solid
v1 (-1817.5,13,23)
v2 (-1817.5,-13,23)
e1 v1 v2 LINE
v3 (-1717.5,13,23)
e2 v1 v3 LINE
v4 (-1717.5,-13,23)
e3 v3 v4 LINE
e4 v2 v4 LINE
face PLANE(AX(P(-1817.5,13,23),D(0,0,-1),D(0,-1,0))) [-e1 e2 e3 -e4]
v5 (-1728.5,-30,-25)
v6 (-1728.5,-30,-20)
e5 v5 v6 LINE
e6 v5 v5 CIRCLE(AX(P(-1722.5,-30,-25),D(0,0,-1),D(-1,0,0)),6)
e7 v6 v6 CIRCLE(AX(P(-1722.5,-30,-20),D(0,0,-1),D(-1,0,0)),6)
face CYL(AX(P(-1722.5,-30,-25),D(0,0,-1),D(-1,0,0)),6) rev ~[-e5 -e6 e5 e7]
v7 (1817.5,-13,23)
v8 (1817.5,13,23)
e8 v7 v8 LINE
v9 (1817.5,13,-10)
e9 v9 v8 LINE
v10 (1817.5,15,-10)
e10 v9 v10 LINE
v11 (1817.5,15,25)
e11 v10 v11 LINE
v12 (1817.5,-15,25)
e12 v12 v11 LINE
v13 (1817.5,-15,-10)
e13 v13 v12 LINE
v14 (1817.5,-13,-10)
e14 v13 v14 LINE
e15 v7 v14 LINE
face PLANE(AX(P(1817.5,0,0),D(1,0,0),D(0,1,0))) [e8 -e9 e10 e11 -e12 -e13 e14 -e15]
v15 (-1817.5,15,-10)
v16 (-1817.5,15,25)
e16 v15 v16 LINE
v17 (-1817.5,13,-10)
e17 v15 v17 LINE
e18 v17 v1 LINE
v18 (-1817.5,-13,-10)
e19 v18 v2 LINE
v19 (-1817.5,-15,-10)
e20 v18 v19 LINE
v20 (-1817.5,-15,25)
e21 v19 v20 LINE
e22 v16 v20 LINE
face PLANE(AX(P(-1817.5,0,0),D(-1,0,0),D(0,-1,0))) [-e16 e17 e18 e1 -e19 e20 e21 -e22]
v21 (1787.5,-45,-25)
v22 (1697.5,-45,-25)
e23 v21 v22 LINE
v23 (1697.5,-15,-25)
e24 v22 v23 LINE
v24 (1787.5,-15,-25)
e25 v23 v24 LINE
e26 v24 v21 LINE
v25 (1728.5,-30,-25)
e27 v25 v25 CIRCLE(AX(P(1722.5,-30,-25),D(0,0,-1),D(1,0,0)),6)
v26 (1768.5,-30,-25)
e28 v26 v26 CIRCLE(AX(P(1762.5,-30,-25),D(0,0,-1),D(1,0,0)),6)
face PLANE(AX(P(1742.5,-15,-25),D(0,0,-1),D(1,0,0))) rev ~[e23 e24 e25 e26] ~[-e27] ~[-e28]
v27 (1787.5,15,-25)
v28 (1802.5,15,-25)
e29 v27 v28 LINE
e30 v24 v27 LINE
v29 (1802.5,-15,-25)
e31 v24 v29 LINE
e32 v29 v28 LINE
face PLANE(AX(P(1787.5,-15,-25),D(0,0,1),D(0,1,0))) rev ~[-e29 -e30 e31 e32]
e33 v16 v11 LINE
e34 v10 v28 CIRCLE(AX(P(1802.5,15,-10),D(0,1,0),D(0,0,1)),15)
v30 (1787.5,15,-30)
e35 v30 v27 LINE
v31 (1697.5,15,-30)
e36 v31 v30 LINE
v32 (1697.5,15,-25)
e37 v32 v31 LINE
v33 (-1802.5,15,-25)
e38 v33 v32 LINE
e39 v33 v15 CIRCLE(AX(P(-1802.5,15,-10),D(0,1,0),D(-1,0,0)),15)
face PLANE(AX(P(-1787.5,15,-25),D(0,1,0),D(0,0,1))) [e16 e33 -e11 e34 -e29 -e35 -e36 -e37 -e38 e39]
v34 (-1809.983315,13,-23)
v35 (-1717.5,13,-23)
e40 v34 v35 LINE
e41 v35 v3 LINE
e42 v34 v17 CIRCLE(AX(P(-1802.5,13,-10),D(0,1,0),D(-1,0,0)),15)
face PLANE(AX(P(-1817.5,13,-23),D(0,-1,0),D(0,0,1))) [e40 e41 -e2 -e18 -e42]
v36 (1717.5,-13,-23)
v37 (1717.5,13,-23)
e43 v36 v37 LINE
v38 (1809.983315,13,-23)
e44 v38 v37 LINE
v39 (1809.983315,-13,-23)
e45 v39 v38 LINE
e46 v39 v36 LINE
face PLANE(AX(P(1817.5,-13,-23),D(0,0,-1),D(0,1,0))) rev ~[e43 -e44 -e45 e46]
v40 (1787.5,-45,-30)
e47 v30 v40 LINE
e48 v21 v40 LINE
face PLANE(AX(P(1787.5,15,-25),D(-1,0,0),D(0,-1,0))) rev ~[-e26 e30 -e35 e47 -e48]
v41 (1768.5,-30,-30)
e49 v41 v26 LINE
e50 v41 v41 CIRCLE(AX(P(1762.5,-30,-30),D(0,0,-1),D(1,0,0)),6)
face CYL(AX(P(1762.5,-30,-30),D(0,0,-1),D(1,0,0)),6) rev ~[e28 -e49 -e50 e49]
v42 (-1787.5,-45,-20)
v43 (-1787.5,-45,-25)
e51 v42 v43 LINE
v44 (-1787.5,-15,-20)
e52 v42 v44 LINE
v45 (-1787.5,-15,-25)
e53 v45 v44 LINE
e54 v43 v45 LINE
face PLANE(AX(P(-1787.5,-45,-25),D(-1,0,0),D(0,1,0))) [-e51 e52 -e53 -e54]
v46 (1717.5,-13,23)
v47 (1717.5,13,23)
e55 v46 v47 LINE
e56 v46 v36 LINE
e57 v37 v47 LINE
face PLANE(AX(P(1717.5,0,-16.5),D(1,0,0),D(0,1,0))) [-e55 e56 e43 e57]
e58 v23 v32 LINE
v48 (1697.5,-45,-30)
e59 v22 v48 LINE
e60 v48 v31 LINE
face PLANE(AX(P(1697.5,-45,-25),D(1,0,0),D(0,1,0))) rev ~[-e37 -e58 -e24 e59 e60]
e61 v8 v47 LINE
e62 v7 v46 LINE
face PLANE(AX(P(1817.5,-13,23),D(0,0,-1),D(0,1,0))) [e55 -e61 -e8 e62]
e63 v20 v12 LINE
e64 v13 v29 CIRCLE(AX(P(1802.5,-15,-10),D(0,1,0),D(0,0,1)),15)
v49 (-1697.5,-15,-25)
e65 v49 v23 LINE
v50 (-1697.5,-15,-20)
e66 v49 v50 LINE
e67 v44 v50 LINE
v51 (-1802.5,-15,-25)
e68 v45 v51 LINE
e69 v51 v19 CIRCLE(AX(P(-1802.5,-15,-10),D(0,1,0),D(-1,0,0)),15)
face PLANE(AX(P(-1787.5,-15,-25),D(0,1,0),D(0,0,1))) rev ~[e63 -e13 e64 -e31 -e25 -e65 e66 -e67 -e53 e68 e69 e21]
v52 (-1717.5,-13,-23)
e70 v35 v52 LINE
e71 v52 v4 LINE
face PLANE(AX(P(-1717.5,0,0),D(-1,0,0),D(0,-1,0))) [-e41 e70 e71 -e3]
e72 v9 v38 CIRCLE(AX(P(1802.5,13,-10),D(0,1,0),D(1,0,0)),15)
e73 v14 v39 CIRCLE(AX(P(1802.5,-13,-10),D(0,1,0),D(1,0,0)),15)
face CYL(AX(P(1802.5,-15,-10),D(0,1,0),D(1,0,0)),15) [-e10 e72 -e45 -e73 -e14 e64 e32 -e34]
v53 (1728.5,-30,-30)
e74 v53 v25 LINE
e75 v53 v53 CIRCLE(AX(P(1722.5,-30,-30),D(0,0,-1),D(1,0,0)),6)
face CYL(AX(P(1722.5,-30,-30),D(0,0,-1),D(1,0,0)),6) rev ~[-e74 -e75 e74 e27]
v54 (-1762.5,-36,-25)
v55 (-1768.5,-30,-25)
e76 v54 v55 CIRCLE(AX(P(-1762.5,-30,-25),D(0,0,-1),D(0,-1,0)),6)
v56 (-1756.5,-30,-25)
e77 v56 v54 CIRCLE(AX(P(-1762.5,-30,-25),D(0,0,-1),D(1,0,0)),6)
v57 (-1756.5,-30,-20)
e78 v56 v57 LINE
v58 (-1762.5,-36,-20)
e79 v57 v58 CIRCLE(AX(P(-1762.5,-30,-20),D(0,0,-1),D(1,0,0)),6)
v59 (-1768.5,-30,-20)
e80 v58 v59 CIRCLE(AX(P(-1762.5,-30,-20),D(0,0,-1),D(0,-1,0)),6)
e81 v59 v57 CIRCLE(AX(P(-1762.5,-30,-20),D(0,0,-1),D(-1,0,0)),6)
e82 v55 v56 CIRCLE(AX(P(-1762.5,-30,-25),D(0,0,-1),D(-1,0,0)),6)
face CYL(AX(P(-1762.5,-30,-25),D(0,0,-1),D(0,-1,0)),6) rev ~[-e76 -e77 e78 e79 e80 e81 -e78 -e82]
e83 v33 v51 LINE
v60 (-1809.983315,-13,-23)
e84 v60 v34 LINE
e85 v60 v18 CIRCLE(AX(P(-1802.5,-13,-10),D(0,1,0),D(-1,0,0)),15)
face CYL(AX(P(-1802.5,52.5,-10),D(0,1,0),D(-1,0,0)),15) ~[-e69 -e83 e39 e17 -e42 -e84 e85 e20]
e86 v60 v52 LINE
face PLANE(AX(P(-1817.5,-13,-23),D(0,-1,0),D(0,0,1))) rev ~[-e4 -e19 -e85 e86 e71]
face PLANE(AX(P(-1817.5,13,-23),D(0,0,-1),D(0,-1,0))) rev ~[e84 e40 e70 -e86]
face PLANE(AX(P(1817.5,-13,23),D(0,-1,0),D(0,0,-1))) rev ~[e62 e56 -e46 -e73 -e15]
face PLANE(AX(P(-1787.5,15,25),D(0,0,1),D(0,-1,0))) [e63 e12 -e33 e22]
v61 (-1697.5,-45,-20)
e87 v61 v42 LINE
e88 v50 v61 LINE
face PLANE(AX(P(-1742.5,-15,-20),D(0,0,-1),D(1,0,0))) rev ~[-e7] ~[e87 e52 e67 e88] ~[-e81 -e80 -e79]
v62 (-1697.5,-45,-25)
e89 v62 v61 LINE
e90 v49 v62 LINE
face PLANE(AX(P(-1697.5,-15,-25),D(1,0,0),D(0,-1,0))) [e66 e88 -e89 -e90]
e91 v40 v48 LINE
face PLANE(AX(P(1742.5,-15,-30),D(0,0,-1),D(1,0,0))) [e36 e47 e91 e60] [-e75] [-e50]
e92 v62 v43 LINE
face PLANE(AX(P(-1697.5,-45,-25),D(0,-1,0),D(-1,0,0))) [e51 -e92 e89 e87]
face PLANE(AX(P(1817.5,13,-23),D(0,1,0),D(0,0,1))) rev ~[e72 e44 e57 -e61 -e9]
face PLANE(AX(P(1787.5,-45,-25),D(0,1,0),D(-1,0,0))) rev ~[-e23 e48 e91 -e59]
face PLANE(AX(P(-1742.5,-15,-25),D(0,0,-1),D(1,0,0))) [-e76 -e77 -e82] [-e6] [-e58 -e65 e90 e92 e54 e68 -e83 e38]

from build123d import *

# Parameters (mm, degrees)
F0_W          = 3575
F0_H          = 50
F1_DEPTH      = 15
F1_DEPTH_BACK = 15
F3_DEPTH      = 5
F5_DEPTH      = 5
F6_R          = 6
F7_DEPTH      = 5
F8_R          = 6
F9_DEPTH      = 5
F12_DEPTH     = 5
F13_W         = 30
F13_H         = 50
F14_DEPTH     = 30
F15_R         = 15
F16_W         = 26
F16_H         = 13
F16_H_2       = 33
F17_DEPTH     = 100
F18_W         = 30
F18_H         = 50
F19_DEPTH     = 30
F20_W         = 26
F20_H         = 46
F21_DEPTH     = 100
F22_T1_DEPTH  = 105
F23_DEPTH     = 5
F24_DEPTH     = 5


# Not quite as in the source:
# - a fillet or chamfer that OpenCascade refuses, or shapes differently, is made with other operations: its cross-section is extruded or revolved along the edge and cut away or added


with BuildPart() as f1:
    # F0 (on Front) → F1 (new body, two sides)
    with BuildSketch(Plane.XZ) as f1_sk:
        Rectangle(F0_W, F0_H)
    extrude(amount=F1_DEPTH)
    extrude(f1_sk.sketch, amount=-F1_DEPTH_BACK)

    # F2 (on face) → F3 (join)
    with BuildSketch(Plane(origin=(0, 0, -25), x_dir=(1, 0, 0), z_dir=(0, 0, -1))):
        Polygon((-1787.5, 45), (-1787.5, 15), (-1787.5, -15), (-1697.5, -15), (-1697.5, 45), align=None)
    extrude(amount=F3_DEPTH)

    # F4 (on face) → F5 (join)
    with BuildSketch(Plane(origin=(0, 0, -25), x_dir=(1, 0, 0), z_dir=(0, 0, -1))):
        Polygon((1787.5, -15), (1787.5, 15), (1787.5, 45), (1697.5, 45), (1697.5, -15), align=None)
    extrude(amount=F5_DEPTH)

    # F6 (on face) → F7 (cut, through all)
    with BuildSketch(Plane(origin=(0, 0, -30), x_dir=(1, 0, 0), z_dir=(0, 0, -1))):
        with Locations((-935, 30)):
            Circle(F6_R)
        with Locations((-975, 30)):
            Circle(F6_R)
    extrude(amount=-F7_DEPTH, mode=Mode.SUBTRACT)

    # F8 (on face) → F9 (cut, through all)
    with BuildSketch(Plane(origin=(0, 0, -30), x_dir=(1, 0, 0), z_dir=(0, 0, -1))):
        with Locations((1762.5, 30)):
            Circle(F8_R)
        with Locations((1722.5, 30)):
            Circle(F8_R)
    extrude(amount=-F9_DEPTH, mode=Mode.SUBTRACT)

    # F11 (on face) → F12 (cut, through all)
    with BuildSketch(Plane(origin=(0, 0, -30), x_dir=(1, 0, 0), z_dir=(0, 0, -1))):
        with BuildLine():
            ThreePointArc((-1762.5, 36), (-1766.7426406871, 34.2426406871), (-1768.5, 30))
            Line((-1768.5, 30), (-1762.5, 30))
            Line((-1762.5, 30), (-1762.5, 36))
        make_face()
        with BuildLine():
            ThreePointArc((-1716.5, 30), (-1722.5, 36), (-1728.5, 30))
            ThreePointArc((-1728.5, 30), (-1722.5, 24), (-1716.5, 30))
        make_face()
        with BuildLine():
            Line((-1762.5, 30), (-1768.5, 30))
            ThreePointArc((-1768.5, 30), (-1762.5, 24), (-1756.5, 30))
            Line((-1756.5, 30), (-1762.5, 30))
        make_face()
        with BuildLine():
            Line((-1762.5, 36), (-1762.5, 30))
            Line((-1762.5, 30), (-1756.5, 30))
            ThreePointArc((-1756.5, 30), (-1758.2573593129, 34.2426406871), (-1762.5, 36))
        make_face()
    extrude(amount=-F12_DEPTH, mode=Mode.SUBTRACT)

    # F13 (on face) → F14 (join)
    with BuildSketch(Plane.YZ.offset(1787.5)):
        Rectangle(F13_W, F13_H)
    extrude(amount=F14_DEPTH)

    # F15
    f15_edges = [f1.edges().sort_by_distance(p)[0] for p in [
        (1817.5, 0, -25),
    ]]
    fillet(f15_edges, radius=F15_R)

    # F16 (on face) → F17 (cut)
    with BuildSketch(Plane.YZ.offset(1817.5)):
        with Locations((0, -16.5)):
            Rectangle(F16_W, F16_H)
        with Locations((0, 6.5)):
            Rectangle(F16_W, F16_H_2)
    extrude(amount=-F17_DEPTH, mode=Mode.SUBTRACT)

    # F18 (on face) → F19 (join)
    with BuildSketch(Plane(origin=(-1787.5, 0, 0), x_dir=(0, -1, 0), z_dir=(-1, 0, 0))):
        Rectangle(F18_W, F18_H)
    extrude(amount=F19_DEPTH)

    # F20 (on face) → F21 (cut)
    with BuildSketch(Plane(origin=(-1817.5, 0, 0), x_dir=(0, -1, 0), z_dir=(-1, 0, 0))):
        Rectangle(F20_W, F20_H)
    extrude(amount=-F21_DEPTH, mode=Mode.SUBTRACT)

    # F22: fillet of radius 15 on 1 edges, made by hand

    # F22_s2 → F22_t1 (cut)
    with BuildSketch(Plane.XZ.offset(-52.5)):
        with BuildLine():
            ThreePointArc((-1817.5, -10), (-1813.1066017178, -20.6066017178), (-1802.5, -25))
            Line((-1802.5, -25), (-1817.5, -25))
            Line((-1817.5, -25), (-1817.5, -10))
        make_face()
    extrude(amount=F22_T1_DEPTH, mode=Mode.SUBTRACT)

    # F23 (add): a face of the model
    f23_faces = [f1.faces().sort_by_distance(p)[0] for p in [
        (-1742.5, -30, -25),
    ]]
    extrude(f23_faces, amount=F23_DEPTH)

    # F24 (cut): a face of the model
    f24_faces = [f1.faces().sort_by_distance(p)[0] for p in [
        (-1742.5, -14.3442118808, -30),
    ]]
    extrude(f24_faces, amount=-F24_DEPTH, mode=Mode.SUBTRACT)


solid = f1.part
